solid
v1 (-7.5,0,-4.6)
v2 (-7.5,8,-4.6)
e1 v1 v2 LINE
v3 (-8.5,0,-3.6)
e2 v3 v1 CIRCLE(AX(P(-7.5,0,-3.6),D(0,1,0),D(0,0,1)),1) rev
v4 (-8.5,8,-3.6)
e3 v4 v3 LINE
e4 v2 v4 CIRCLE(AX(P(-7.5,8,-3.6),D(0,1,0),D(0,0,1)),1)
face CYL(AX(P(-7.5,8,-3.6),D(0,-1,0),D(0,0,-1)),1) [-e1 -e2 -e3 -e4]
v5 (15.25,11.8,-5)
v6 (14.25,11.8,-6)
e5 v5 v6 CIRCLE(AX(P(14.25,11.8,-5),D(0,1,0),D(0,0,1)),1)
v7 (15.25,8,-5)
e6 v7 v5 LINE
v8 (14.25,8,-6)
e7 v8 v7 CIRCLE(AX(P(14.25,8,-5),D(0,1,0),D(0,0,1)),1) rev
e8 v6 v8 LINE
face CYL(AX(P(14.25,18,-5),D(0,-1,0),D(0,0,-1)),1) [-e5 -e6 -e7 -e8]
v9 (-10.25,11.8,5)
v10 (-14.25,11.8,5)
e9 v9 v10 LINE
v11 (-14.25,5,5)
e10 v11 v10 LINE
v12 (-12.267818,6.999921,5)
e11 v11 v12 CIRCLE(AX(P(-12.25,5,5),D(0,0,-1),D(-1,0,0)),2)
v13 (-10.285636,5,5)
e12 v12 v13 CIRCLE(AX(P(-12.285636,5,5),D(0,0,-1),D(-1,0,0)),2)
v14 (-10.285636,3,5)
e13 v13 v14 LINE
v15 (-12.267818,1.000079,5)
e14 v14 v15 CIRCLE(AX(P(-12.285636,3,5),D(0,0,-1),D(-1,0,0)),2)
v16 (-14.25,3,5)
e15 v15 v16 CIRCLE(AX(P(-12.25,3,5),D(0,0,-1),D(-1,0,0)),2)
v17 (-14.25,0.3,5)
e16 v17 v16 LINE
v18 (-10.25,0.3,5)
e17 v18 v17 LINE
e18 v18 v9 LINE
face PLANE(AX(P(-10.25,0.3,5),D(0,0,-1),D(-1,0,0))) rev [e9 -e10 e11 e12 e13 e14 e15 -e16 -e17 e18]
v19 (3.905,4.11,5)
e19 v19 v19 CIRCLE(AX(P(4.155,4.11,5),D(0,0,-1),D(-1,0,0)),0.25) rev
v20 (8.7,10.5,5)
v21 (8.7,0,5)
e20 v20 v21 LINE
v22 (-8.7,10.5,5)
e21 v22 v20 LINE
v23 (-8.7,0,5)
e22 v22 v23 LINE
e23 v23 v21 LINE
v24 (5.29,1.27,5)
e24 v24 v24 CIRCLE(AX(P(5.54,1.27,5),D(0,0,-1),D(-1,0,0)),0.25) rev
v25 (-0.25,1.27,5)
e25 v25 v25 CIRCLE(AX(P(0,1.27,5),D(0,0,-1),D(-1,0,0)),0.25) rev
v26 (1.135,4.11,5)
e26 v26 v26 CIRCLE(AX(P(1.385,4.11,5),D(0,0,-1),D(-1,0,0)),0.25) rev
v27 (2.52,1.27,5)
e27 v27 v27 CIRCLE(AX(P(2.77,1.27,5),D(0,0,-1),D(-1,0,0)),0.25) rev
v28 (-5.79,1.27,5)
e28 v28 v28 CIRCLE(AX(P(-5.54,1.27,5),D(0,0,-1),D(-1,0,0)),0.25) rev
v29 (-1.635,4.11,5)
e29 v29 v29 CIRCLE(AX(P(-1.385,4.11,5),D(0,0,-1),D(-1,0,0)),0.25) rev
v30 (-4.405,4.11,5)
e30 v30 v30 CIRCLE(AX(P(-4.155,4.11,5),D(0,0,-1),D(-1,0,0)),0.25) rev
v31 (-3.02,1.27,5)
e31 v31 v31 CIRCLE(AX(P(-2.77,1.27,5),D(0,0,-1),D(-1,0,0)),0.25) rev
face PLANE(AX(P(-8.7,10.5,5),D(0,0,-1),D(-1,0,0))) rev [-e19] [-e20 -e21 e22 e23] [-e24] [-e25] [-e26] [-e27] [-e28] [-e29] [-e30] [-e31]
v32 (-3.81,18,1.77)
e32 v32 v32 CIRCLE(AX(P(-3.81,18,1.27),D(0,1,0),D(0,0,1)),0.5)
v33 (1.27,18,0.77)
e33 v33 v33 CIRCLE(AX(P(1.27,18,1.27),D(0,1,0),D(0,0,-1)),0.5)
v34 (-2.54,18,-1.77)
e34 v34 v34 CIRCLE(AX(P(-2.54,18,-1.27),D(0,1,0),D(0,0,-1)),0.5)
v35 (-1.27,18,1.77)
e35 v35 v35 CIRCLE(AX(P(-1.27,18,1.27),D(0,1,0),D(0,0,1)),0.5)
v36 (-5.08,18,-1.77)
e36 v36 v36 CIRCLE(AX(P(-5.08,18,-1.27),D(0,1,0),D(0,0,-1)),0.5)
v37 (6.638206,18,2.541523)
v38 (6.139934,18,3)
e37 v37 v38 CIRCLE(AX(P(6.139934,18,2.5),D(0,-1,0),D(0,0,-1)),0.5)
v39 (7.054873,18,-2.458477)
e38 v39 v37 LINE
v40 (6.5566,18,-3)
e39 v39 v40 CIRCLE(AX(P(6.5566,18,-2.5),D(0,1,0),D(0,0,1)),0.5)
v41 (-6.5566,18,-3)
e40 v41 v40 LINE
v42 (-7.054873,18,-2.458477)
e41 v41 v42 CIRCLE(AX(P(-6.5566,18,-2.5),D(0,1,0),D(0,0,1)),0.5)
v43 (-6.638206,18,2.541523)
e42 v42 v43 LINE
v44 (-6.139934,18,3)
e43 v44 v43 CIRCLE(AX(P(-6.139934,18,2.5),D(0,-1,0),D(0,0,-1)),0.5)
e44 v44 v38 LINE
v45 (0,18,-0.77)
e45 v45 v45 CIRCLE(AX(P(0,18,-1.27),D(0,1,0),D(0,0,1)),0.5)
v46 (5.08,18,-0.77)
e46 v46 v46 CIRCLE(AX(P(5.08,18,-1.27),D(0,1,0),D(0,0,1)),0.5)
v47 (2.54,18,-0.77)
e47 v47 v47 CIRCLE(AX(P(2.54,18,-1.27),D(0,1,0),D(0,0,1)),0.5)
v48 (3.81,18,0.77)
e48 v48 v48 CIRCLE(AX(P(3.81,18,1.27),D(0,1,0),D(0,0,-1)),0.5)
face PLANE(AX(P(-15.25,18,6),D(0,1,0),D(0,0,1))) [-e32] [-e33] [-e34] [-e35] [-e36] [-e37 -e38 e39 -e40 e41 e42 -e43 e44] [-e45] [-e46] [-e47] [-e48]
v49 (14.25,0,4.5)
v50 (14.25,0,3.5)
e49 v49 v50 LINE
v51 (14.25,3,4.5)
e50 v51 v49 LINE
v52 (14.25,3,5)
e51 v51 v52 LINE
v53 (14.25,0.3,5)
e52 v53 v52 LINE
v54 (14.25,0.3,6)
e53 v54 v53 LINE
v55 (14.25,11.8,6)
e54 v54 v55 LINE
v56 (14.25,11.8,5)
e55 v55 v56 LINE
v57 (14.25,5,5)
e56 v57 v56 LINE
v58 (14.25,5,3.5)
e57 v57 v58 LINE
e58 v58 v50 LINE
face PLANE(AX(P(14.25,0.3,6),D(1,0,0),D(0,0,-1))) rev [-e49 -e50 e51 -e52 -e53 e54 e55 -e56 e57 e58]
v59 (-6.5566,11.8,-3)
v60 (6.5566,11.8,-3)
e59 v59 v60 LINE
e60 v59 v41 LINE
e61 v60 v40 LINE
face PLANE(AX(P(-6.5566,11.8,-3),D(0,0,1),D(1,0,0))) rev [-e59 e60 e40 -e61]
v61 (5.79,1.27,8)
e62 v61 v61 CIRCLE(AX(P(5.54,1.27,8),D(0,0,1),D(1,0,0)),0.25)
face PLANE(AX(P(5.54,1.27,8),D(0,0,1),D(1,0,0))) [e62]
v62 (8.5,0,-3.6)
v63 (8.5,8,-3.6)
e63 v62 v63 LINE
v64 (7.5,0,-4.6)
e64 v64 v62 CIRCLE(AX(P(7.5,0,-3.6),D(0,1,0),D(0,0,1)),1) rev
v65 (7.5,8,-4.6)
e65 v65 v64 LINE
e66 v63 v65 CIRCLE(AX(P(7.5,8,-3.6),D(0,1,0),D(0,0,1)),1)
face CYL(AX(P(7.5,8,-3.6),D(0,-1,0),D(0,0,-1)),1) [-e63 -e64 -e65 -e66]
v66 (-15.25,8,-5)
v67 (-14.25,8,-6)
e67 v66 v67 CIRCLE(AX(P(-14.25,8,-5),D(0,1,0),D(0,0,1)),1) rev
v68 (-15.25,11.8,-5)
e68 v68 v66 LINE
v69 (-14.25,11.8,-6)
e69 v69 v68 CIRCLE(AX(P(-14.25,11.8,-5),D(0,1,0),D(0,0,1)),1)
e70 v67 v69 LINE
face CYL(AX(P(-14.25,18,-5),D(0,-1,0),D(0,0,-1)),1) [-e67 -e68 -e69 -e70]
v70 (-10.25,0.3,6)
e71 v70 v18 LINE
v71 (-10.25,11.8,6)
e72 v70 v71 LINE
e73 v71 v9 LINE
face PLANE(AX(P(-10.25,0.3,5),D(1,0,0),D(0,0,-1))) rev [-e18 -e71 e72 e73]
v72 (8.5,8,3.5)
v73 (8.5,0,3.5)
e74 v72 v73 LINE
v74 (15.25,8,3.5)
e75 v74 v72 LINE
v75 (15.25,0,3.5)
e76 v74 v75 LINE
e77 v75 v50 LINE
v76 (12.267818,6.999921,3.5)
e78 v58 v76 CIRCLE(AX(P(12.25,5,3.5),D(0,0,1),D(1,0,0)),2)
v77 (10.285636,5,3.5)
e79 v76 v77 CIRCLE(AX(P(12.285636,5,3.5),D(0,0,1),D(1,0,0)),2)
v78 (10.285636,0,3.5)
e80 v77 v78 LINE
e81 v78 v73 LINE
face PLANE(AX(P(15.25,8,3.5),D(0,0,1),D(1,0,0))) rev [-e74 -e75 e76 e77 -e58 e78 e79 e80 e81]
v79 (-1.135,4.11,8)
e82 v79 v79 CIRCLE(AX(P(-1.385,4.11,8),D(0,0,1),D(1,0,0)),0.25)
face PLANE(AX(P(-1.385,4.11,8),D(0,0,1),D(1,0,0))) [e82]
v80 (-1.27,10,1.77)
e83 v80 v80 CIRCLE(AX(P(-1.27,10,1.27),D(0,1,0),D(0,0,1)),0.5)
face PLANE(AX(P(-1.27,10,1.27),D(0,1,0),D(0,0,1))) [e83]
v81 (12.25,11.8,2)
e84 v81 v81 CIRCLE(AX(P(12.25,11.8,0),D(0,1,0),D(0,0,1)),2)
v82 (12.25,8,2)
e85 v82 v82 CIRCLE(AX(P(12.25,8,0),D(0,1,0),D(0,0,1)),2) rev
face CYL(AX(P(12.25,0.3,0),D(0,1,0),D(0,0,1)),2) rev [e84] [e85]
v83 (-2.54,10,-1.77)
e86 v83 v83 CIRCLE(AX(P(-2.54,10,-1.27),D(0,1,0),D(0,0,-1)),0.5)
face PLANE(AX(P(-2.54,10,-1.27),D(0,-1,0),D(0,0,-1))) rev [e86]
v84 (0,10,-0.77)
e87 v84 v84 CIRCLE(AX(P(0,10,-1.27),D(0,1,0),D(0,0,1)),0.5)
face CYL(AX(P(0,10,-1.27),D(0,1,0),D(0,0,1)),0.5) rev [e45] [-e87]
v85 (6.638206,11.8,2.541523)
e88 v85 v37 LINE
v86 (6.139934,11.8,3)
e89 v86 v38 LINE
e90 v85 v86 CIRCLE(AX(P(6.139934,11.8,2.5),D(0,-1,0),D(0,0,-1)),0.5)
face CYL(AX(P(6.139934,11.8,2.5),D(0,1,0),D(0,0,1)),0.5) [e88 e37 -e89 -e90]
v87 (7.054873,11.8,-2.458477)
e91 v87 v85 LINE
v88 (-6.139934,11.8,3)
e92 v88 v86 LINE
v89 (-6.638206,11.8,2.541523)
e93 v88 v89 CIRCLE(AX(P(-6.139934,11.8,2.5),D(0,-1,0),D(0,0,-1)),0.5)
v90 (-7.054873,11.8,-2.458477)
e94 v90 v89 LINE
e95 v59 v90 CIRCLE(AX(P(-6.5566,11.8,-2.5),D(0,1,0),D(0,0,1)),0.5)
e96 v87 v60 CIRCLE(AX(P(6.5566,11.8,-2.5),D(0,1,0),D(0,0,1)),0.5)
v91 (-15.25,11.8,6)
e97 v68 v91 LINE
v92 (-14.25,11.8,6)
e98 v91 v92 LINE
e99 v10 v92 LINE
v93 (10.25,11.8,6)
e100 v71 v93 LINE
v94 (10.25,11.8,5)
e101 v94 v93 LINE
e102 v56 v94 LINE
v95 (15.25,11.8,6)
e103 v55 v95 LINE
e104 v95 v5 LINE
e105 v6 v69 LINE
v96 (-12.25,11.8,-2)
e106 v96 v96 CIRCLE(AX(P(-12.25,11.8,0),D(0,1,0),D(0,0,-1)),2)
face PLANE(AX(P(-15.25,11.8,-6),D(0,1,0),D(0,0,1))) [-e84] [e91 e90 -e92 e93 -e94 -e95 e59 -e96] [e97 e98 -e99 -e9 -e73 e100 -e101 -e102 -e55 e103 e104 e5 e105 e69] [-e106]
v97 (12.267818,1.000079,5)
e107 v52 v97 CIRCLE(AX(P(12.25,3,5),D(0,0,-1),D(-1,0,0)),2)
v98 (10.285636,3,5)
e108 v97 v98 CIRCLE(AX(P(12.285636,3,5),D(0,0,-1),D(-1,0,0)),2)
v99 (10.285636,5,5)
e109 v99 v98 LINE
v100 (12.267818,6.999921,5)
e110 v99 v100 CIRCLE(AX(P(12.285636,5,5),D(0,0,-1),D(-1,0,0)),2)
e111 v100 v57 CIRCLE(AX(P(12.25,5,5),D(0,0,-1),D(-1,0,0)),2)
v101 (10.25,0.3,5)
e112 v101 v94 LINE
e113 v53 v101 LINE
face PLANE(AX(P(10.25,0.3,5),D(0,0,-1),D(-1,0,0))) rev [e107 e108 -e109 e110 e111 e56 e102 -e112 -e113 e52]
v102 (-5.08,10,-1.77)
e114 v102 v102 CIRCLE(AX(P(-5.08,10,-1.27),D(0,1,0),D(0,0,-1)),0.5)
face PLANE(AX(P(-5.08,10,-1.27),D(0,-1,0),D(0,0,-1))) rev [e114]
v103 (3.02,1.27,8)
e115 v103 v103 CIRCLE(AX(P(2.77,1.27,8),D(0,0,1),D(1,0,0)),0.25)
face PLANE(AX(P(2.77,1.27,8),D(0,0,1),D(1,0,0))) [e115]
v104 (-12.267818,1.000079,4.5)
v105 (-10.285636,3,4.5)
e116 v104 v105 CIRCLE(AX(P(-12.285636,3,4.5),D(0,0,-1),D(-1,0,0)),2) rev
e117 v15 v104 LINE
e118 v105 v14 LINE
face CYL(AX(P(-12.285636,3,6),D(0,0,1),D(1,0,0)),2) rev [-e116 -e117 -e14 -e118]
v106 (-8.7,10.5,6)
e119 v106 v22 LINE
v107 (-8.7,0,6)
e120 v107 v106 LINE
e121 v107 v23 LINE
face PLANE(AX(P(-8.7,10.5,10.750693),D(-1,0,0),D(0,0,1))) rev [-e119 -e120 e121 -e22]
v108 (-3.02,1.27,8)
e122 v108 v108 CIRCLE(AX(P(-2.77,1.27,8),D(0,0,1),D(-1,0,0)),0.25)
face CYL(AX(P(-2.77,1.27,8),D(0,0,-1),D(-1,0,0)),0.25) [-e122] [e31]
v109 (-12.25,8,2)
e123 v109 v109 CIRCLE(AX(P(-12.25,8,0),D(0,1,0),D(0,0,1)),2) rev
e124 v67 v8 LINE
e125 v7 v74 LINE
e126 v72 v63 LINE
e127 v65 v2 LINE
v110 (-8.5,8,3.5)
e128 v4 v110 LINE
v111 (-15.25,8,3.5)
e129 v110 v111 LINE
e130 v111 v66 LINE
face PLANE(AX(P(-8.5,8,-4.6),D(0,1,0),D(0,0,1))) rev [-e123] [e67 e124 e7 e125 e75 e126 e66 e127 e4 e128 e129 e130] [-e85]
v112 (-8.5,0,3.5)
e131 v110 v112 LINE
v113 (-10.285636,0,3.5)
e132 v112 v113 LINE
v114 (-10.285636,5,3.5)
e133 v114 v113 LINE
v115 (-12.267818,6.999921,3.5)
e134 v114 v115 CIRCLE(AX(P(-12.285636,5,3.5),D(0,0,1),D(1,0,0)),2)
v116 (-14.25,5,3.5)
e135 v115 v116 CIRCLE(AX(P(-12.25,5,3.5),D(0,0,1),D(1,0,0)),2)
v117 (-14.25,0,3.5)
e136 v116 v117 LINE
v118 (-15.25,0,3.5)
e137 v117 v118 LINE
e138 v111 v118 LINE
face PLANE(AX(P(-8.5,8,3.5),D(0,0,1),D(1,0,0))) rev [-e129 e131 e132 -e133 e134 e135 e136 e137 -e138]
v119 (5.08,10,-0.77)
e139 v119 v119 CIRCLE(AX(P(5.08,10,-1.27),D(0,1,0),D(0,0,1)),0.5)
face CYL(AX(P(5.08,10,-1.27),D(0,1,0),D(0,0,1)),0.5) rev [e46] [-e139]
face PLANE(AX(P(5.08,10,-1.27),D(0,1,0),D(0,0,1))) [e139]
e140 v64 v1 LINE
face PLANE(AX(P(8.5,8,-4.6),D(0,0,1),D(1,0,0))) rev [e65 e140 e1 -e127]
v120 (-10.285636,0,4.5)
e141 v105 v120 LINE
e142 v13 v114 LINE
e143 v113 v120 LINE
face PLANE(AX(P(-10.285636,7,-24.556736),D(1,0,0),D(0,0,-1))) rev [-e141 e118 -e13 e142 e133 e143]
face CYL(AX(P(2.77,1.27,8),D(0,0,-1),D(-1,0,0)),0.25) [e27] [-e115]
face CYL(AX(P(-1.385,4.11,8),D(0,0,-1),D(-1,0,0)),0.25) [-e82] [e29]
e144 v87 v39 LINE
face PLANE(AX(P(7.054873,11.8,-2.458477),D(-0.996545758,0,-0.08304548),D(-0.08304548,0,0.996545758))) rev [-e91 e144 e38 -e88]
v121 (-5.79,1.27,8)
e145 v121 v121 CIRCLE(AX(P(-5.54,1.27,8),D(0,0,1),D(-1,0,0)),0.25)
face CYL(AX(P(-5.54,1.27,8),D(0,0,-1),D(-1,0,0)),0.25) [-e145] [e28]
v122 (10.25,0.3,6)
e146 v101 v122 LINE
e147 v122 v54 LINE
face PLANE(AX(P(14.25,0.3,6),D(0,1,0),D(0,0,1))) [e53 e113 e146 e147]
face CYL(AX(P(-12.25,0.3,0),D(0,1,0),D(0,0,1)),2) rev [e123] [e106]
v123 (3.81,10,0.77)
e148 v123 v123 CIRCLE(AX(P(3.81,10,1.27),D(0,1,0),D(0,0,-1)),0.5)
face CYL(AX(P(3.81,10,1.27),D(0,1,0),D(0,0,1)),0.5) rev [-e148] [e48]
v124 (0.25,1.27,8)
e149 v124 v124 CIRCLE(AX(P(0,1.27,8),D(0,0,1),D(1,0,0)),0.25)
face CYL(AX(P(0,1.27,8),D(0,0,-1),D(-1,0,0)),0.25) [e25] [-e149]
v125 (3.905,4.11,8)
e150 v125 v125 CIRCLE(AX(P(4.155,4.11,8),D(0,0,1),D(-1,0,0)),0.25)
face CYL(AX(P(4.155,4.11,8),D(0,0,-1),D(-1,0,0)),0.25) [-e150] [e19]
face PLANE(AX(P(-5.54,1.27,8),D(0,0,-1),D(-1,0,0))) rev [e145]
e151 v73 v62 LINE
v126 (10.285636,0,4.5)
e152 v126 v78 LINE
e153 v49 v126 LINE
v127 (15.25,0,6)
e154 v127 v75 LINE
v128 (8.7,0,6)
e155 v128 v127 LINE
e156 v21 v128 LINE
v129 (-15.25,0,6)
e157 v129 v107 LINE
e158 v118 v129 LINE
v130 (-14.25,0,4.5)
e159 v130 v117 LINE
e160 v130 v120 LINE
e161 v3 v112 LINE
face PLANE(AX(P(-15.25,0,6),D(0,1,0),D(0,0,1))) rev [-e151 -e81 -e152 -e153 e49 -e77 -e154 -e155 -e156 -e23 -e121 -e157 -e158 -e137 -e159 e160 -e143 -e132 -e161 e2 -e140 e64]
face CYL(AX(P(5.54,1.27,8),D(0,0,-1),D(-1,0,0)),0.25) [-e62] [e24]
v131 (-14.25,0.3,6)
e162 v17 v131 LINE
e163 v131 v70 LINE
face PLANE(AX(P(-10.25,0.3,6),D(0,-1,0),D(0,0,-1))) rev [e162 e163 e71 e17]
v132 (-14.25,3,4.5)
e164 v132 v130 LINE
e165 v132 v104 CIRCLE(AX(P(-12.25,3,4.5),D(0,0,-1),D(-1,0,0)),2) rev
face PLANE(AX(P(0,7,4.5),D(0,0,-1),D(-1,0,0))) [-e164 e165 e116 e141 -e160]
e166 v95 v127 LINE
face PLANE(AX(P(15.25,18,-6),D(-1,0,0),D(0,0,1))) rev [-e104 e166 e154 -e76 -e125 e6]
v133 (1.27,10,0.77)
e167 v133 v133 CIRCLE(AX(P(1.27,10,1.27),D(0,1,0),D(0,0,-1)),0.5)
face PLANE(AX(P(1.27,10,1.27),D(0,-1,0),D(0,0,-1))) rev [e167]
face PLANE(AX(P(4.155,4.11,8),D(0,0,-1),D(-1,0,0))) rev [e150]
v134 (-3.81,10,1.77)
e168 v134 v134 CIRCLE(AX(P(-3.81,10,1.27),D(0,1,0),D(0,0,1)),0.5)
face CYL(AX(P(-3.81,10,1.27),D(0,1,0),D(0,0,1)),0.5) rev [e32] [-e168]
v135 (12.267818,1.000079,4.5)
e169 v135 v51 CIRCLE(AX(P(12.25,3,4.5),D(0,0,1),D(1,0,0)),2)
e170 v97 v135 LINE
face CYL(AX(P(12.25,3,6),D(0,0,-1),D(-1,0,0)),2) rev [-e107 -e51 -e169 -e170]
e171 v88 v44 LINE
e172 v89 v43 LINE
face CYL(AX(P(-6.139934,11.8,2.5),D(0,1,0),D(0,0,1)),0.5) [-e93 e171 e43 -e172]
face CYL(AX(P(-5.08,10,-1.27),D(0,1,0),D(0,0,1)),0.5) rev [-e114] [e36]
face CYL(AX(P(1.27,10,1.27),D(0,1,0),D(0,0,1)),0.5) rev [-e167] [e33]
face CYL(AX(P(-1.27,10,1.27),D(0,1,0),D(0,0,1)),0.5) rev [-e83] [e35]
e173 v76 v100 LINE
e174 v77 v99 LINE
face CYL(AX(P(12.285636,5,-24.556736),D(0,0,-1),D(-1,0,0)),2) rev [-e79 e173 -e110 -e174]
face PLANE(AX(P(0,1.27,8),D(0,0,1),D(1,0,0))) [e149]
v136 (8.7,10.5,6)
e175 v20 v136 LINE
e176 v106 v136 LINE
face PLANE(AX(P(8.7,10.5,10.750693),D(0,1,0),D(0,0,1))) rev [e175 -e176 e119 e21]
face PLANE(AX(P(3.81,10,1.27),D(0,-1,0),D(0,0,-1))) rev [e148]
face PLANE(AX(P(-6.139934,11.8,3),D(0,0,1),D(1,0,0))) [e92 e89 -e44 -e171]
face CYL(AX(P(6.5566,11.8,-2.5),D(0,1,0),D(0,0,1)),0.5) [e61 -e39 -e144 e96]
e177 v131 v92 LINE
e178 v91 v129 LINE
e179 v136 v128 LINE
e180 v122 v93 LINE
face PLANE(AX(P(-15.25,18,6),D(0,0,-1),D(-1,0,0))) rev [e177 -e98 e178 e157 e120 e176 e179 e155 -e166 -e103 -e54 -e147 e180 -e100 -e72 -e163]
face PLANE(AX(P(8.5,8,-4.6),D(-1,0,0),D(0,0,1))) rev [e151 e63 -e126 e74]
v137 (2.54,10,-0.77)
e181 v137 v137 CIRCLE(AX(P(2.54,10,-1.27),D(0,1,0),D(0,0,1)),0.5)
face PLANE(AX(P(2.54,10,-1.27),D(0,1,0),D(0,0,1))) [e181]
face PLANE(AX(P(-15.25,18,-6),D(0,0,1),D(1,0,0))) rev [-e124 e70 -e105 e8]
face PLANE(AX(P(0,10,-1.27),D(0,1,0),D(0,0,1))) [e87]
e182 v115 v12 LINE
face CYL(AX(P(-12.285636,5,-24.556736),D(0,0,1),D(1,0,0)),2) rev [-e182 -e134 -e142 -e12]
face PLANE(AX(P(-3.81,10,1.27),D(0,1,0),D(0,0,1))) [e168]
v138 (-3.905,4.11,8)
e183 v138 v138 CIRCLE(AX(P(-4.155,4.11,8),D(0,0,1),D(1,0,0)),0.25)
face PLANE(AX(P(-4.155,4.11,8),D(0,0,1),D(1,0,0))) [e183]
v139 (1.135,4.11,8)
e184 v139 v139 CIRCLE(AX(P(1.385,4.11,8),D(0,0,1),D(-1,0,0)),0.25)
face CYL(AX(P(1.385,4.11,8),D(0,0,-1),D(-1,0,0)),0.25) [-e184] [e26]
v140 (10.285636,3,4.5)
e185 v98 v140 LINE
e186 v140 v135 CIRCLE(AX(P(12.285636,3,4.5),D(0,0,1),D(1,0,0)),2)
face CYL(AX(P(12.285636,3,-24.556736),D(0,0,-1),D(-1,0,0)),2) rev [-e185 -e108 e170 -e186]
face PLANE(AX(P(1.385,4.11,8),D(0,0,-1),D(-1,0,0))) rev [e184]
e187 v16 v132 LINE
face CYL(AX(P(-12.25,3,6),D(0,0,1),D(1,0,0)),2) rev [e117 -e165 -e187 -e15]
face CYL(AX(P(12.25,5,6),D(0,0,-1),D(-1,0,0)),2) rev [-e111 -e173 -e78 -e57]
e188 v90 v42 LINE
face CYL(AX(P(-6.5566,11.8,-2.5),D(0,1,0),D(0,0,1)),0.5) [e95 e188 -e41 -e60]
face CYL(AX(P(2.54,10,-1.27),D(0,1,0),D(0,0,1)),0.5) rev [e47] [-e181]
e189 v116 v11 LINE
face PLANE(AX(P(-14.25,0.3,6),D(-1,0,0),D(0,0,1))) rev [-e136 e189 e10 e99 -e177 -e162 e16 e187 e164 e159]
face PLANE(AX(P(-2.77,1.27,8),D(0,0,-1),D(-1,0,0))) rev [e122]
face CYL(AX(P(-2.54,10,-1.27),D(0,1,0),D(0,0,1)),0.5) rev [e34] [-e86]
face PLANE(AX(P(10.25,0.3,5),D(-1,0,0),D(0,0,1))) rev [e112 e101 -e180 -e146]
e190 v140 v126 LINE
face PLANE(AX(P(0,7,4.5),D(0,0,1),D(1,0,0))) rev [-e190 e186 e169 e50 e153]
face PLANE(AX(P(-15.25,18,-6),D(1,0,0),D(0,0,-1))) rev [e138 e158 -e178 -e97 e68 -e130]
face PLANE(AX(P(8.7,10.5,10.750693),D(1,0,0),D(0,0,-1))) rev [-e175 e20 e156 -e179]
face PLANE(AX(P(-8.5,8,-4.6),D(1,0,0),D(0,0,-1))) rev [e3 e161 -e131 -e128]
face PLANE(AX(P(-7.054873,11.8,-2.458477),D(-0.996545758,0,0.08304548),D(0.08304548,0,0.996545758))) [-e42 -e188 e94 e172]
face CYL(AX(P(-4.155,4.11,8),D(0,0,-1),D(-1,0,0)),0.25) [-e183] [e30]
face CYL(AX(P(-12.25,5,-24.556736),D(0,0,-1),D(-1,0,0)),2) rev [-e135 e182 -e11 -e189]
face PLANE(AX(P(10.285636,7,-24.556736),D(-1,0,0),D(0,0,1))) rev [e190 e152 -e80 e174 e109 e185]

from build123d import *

# Parameters (mm, degrees)
SKETCH_1_W          = 30.5
SKETCH_1_H          = 12
EXTRUDE_1_DEPTH     = 18
SKETCH_2_W          = 30.5
SKETCH_2_H          = 12
CUT_EXTRUDE_2_DEPTH = 6.2
SKETCH_3_R          = 2
SKETCH_3_W          = 4
SKETCH_3_H          = 1
CUT_EXTRUDE_3_DEPTH = 11.5
CUT_EXTRUDE_4_DEPTH = 8
SKETCH_5_W          = 3.964363922
SKETCH_5_H          = 1
CUT_EXTRUDE_6_DEPTH = 7
SKETCH_6_W          = 3.964363922
SKETCH_6_H          = 6
CUT_EXTRUDE_7_DEPTH = 26.822712871
FILLET_1_R          = 2
FILLET_2_R          = 2
FILLET_3_R          = 1
SKETCH_7_W          = 17.4
SKETCH_7_H          = 5.750693342
CUT_EXTRUDE_8_DEPTH = 10.5
SKETCH_9_R          = 0.5
CUT_EXTRUDE_9_DEPTH = 8
SKETCH_8_R          = 0.25
EXTRUDE_2_DEPTH     = 3


with BuildPart() as part:
    # 草图1 → 凸台-拉伸1 (new body)
    with BuildSketch(Plane(origin=(0, 0, 0), x_dir=(1, 0, 0), z_dir=(0, 1, 0))):
        Rectangle(SKETCH_1_W, SKETCH_1_H)
    extrude(amount=EXTRUDE_1_DEPTH)

    # 草图2 → 切除-拉伸2 (cut)
    with BuildSketch(Plane(origin=(0, 18, 0), x_dir=(1, 0, 0), z_dir=(0, 1, 0))):
        Rectangle(SKETCH_2_W, SKETCH_2_H)
        with BuildLine():
            Line((-6.556600226, 3), (6.556600226, 3))
            ThreePointArc((6.556600226, 3), (6.924541369, 2.838554744), (7.054873105, 2.45847726))
            Line((7.054873105, 2.45847726), (6.638206438, -2.54152274))
            ThreePointArc((6.638206438, -2.54152274), (6.478488304, -2.867941143), (6.139933559, -3))
            Line((6.139933559, -3), (-6.139933559, -3))
            ThreePointArc((-6.139933559, -3), (-6.478488304, -2.867941143), (-6.638206438, -2.54152274))
            Line((-6.638206438, -2.54152274), (-7.054873105, 2.45847726))
            ThreePointArc((-7.054873105, 2.45847726), (-6.924541369, 2.838554744), (-6.556600226, 3))
        make_face(mode=Mode.SUBTRACT)
    extrude(amount=-CUT_EXTRUDE_2_DEPTH, mode=Mode.SUBTRACT)

    # 草图3 → 切除-拉伸3 (cut)
    with BuildSketch(Plane(origin=(0, 11.8, 0), x_dir=(1, 0, 0), z_dir=(0, 1, 0))):
        with Locations(Location((12.25, 0, 0), (0, 0, 270))):
            Circle(SKETCH_3_R)
        with Locations(Location((-12.25, 0, 0), (0, 0, 90))):
            Circle(SKETCH_3_R)
        with Locations((12.25, -5.5)):
            Rectangle(SKETCH_3_W, SKETCH_3_H)
        with Locations((-12.25, -5.5)):
            Rectangle(SKETCH_3_W, SKETCH_3_H)
    extrude(amount=-CUT_EXTRUDE_3_DEPTH, mode=Mode.SUBTRACT)

    # 草图4 → 切除-拉伸4 (cut)
    with BuildSketch(Plane.XZ):
        Polygon((8.5, -4.6), (8.5, 3.5), (15.25, 3.5), (15.25, -4.6), (15.25, -6), (-15.25, -6), (-15.25, 3.5), (-8.5, 3.5), (-8.5, -4.6), align=None)
    extrude(amount=-CUT_EXTRUDE_4_DEPTH, mode=Mode.SUBTRACT)

    # 草图5 → 切除-拉伸6 (cut)
    with BuildSketch(Plane.XZ):
        with Locations((12.267818039, 4)):
            Rectangle(SKETCH_5_W, SKETCH_5_H)
        with Locations((-12.267818039, 4)):
            Rectangle(SKETCH_5_W, SKETCH_5_H)
    extrude(amount=-CUT_EXTRUDE_6_DEPTH, mode=Mode.SUBTRACT)

    # 草图6 → 切除-拉伸7 (cut, through all)
    with BuildSketch(Plane(origin=(0, 0, 4.5), x_dir=(-1, 0, 0), z_dir=(0, 0, -1))):
        with Locations((12.267818039, 4)):
            Rectangle(SKETCH_6_W, SKETCH_6_H)
    cut_extrude_7 = extrude(amount=-CUT_EXTRUDE_7_DEPTH, mode=Mode.SUBTRACT)

    # 圆角1
    # the kernel refuses this fillet: 2 mm, written as the material it adds along each edge
    with BuildSketch(Plane(origin=(-14.25, 1, 4.5), x_dir=(0, 1, 0), z_dir=(0, 0, 1)), Plane(origin=(-10.285636078, 1, 4.5), x_dir=(-1, 0, 0), z_dir=(0, 0, 1))) as fillet_1_piece_1:
        with BuildLine():
            CenterArc((FILLET_1_R, -FILLET_1_R), FILLET_1_R, 90, 90)
            Line((0, -FILLET_1_R), (0, 0))
            Line((0, 0), (FILLET_1_R, 0))
        make_face()
    extrude(amount=0.5)
    with BuildSketch(Plane(origin=(-14.25, 7, 3.5), x_dir=(0, -1, 0), z_dir=(0, 0, 1))) as fillet_1_piece_2:
        with BuildLine():
            CenterArc((FILLET_1_R, FILLET_1_R), FILLET_1_R, 180, 90)
            Line((0, FILLET_1_R), (0, 0))
            Line((0, 0), (FILLET_1_R, 0))
        make_face()
    extrude(amount=1.5)
    with BuildSketch(Plane(origin=(-10.285636078, 7, 3.5), x_dir=(0, -1, 0), z_dir=(0, 0, 1))) as fillet_1_piece_3:
        with BuildLine():
            CenterArc((FILLET_1_R, -FILLET_1_R), FILLET_1_R, 90, 90)
            Line((0, -FILLET_1_R), (0, 0))
            Line((0, 0), (FILLET_1_R, 0))
        make_face()
    extrude(amount=1.5)

    # 镜向1: 切除-拉伸7 across plane
    add(cut_extrude_7.mirror(Plane(origin=(0, 0, 0), x_dir=(0, 0, 1), z_dir=(1, 0, 0))), mode=Mode.SUBTRACT)

    # 圆角2
    # the kernel refuses this fillet: 2 mm, written as the material it adds along each edge
    with BuildSketch(Plane(origin=(14.25, 1, 4.5), x_dir=(-1, 0, 0), z_dir=(0, 0, 1))) as fillet_2_piece_1:
        with BuildLine():
            CenterArc((FILLET_2_R, -FILLET_2_R), FILLET_2_R, 90, 90)
            Line((0, -FILLET_2_R), (0, 0))
            Line((0, 0), (FILLET_2_R, 0))
        make_face()
    extrude(amount=0.5)
    with BuildSketch(Plane(origin=(10.285636078, 1, 4.5), x_dir=(1, 0, 0), z_dir=(0, 0, 1))) as fillet_2_piece_2:
        with BuildLine():
            CenterArc((FILLET_2_R, FILLET_2_R), FILLET_2_R, 180, 90)
            Line((0, FILLET_2_R), (0, 0))
            Line((0, 0), (FILLET_2_R, 0))
        make_face()
    extrude(amount=0.5)
    with BuildSketch(Plane(origin=(10.285636078, 7, 3.5), x_dir=(1, 0, 0), z_dir=(0, 0, 1)), Plane(origin=(14.25, 7, 5), x_dir=(-1, 0, 0), z_dir=(0, 0, -1))) as fillet_2_piece_3:
        with BuildLine():
            CenterArc((FILLET_2_R, -FILLET_2_R), FILLET_2_R, 90, 90)
            Line((0, -FILLET_2_R), (0, 0))
            Line((0, 0), (FILLET_2_R, 0))
        make_face()
    extrude(amount=1.5)

    # 圆角3
    fillet_3_edges = [part.edges().sort_by_distance(p)[0] for p in [
        (-15.25, 9.9, -6),
        (15.25, 9.9, -6),
        (-8.5, 4, -4.6),
        (8.5, 4, -4.6),
    ]]
    fillet(fillet_3_edges, radius=FILLET_3_R)

    # 草图7 → 切除-拉伸8 (cut)
    with BuildSketch(Plane.XZ):
        with Locations((0, 7.875346671)):
            Rectangle(SKETCH_7_W, SKETCH_7_H)
    extrude(amount=-CUT_EXTRUDE_8_DEPTH, mode=Mode.SUBTRACT)

    # 草图9 → 切除-拉伸9 (cut)
    with BuildSketch(Plane(origin=(0, 18, 0), x_dir=(1, 0, 0), z_dir=(0, 1, 0))):
        with Locations(Location((0, 1.27, 0), (0, 0, 270))):
            Circle(SKETCH_9_R)
        with Locations(Location((2.54, 1.27, 0), (0, 0, 270))):
            Circle(SKETCH_9_R)
        with Locations(Location((5.08, 1.27, 0), (0, 0, 270))):
            Circle(SKETCH_9_R)
        with Locations(Location((-5.08, 1.27, 0), (0, 0, 90))):
            Circle(SKETCH_9_R)
        with Locations(Location((-2.54, 1.27, 0), (0, 0, 90))):
            Circle(SKETCH_9_R)
        with Locations(Location((-1.27, -1.27, 0), (0, 0, 270))):
            Circle(SKETCH_9_R)
        with Locations(Location((-3.81, -1.27, 0), (0, 0, 270))):
            Circle(SKETCH_9_R)
        with Locations(Location((3.81, -1.27, 0), (0, 0, 90))):
            Circle(SKETCH_9_R)
        with Locations(Location((1.27, -1.27, 0), (0, 0, 90))):
            Circle(SKETCH_9_R)
    extrude(amount=-CUT_EXTRUDE_9_DEPTH, mode=Mode.SUBTRACT)

    # 草图8 → 凸台-拉伸2 (add)
    with BuildSketch(Plane.XY.offset(5)):
        with Locations(Location((0, 1.27, 0), (0, 0, 180))):
            Circle(SKETCH_8_R)
        with Locations(Location((2.77, 1.27, 0), (0, 0, 180))):
            Circle(SKETCH_8_R)
        with Locations(Location((5.54, 1.27, 0), (0, 0, 180))):
            Circle(SKETCH_8_R)
        with Locations(Location((-5.54, 1.27, 0), (0, 0, 180))):
            Circle(SKETCH_8_R)
        with Locations(Location((-2.77, 1.27, 0), (0, 0, 180))):
            Circle(SKETCH_8_R)
        with Locations(Location((-1.385, 4.11, 0), (0, 0, 180))):
            Circle(SKETCH_8_R)
        with Locations(Location((1.385, 4.11, 0), (0, 0, 180))):
            Circle(SKETCH_8_R)
        with Locations(Location((-4.155, 4.11, 0), (0, 0, 180))):
            Circle(SKETCH_8_R)
        with Locations(Location((4.155, 4.11, 0), (0, 0, 180))):
            Circle(SKETCH_8_R)
    extrude(amount=EXTRUDE_2_DEPTH)


solid = part.part
